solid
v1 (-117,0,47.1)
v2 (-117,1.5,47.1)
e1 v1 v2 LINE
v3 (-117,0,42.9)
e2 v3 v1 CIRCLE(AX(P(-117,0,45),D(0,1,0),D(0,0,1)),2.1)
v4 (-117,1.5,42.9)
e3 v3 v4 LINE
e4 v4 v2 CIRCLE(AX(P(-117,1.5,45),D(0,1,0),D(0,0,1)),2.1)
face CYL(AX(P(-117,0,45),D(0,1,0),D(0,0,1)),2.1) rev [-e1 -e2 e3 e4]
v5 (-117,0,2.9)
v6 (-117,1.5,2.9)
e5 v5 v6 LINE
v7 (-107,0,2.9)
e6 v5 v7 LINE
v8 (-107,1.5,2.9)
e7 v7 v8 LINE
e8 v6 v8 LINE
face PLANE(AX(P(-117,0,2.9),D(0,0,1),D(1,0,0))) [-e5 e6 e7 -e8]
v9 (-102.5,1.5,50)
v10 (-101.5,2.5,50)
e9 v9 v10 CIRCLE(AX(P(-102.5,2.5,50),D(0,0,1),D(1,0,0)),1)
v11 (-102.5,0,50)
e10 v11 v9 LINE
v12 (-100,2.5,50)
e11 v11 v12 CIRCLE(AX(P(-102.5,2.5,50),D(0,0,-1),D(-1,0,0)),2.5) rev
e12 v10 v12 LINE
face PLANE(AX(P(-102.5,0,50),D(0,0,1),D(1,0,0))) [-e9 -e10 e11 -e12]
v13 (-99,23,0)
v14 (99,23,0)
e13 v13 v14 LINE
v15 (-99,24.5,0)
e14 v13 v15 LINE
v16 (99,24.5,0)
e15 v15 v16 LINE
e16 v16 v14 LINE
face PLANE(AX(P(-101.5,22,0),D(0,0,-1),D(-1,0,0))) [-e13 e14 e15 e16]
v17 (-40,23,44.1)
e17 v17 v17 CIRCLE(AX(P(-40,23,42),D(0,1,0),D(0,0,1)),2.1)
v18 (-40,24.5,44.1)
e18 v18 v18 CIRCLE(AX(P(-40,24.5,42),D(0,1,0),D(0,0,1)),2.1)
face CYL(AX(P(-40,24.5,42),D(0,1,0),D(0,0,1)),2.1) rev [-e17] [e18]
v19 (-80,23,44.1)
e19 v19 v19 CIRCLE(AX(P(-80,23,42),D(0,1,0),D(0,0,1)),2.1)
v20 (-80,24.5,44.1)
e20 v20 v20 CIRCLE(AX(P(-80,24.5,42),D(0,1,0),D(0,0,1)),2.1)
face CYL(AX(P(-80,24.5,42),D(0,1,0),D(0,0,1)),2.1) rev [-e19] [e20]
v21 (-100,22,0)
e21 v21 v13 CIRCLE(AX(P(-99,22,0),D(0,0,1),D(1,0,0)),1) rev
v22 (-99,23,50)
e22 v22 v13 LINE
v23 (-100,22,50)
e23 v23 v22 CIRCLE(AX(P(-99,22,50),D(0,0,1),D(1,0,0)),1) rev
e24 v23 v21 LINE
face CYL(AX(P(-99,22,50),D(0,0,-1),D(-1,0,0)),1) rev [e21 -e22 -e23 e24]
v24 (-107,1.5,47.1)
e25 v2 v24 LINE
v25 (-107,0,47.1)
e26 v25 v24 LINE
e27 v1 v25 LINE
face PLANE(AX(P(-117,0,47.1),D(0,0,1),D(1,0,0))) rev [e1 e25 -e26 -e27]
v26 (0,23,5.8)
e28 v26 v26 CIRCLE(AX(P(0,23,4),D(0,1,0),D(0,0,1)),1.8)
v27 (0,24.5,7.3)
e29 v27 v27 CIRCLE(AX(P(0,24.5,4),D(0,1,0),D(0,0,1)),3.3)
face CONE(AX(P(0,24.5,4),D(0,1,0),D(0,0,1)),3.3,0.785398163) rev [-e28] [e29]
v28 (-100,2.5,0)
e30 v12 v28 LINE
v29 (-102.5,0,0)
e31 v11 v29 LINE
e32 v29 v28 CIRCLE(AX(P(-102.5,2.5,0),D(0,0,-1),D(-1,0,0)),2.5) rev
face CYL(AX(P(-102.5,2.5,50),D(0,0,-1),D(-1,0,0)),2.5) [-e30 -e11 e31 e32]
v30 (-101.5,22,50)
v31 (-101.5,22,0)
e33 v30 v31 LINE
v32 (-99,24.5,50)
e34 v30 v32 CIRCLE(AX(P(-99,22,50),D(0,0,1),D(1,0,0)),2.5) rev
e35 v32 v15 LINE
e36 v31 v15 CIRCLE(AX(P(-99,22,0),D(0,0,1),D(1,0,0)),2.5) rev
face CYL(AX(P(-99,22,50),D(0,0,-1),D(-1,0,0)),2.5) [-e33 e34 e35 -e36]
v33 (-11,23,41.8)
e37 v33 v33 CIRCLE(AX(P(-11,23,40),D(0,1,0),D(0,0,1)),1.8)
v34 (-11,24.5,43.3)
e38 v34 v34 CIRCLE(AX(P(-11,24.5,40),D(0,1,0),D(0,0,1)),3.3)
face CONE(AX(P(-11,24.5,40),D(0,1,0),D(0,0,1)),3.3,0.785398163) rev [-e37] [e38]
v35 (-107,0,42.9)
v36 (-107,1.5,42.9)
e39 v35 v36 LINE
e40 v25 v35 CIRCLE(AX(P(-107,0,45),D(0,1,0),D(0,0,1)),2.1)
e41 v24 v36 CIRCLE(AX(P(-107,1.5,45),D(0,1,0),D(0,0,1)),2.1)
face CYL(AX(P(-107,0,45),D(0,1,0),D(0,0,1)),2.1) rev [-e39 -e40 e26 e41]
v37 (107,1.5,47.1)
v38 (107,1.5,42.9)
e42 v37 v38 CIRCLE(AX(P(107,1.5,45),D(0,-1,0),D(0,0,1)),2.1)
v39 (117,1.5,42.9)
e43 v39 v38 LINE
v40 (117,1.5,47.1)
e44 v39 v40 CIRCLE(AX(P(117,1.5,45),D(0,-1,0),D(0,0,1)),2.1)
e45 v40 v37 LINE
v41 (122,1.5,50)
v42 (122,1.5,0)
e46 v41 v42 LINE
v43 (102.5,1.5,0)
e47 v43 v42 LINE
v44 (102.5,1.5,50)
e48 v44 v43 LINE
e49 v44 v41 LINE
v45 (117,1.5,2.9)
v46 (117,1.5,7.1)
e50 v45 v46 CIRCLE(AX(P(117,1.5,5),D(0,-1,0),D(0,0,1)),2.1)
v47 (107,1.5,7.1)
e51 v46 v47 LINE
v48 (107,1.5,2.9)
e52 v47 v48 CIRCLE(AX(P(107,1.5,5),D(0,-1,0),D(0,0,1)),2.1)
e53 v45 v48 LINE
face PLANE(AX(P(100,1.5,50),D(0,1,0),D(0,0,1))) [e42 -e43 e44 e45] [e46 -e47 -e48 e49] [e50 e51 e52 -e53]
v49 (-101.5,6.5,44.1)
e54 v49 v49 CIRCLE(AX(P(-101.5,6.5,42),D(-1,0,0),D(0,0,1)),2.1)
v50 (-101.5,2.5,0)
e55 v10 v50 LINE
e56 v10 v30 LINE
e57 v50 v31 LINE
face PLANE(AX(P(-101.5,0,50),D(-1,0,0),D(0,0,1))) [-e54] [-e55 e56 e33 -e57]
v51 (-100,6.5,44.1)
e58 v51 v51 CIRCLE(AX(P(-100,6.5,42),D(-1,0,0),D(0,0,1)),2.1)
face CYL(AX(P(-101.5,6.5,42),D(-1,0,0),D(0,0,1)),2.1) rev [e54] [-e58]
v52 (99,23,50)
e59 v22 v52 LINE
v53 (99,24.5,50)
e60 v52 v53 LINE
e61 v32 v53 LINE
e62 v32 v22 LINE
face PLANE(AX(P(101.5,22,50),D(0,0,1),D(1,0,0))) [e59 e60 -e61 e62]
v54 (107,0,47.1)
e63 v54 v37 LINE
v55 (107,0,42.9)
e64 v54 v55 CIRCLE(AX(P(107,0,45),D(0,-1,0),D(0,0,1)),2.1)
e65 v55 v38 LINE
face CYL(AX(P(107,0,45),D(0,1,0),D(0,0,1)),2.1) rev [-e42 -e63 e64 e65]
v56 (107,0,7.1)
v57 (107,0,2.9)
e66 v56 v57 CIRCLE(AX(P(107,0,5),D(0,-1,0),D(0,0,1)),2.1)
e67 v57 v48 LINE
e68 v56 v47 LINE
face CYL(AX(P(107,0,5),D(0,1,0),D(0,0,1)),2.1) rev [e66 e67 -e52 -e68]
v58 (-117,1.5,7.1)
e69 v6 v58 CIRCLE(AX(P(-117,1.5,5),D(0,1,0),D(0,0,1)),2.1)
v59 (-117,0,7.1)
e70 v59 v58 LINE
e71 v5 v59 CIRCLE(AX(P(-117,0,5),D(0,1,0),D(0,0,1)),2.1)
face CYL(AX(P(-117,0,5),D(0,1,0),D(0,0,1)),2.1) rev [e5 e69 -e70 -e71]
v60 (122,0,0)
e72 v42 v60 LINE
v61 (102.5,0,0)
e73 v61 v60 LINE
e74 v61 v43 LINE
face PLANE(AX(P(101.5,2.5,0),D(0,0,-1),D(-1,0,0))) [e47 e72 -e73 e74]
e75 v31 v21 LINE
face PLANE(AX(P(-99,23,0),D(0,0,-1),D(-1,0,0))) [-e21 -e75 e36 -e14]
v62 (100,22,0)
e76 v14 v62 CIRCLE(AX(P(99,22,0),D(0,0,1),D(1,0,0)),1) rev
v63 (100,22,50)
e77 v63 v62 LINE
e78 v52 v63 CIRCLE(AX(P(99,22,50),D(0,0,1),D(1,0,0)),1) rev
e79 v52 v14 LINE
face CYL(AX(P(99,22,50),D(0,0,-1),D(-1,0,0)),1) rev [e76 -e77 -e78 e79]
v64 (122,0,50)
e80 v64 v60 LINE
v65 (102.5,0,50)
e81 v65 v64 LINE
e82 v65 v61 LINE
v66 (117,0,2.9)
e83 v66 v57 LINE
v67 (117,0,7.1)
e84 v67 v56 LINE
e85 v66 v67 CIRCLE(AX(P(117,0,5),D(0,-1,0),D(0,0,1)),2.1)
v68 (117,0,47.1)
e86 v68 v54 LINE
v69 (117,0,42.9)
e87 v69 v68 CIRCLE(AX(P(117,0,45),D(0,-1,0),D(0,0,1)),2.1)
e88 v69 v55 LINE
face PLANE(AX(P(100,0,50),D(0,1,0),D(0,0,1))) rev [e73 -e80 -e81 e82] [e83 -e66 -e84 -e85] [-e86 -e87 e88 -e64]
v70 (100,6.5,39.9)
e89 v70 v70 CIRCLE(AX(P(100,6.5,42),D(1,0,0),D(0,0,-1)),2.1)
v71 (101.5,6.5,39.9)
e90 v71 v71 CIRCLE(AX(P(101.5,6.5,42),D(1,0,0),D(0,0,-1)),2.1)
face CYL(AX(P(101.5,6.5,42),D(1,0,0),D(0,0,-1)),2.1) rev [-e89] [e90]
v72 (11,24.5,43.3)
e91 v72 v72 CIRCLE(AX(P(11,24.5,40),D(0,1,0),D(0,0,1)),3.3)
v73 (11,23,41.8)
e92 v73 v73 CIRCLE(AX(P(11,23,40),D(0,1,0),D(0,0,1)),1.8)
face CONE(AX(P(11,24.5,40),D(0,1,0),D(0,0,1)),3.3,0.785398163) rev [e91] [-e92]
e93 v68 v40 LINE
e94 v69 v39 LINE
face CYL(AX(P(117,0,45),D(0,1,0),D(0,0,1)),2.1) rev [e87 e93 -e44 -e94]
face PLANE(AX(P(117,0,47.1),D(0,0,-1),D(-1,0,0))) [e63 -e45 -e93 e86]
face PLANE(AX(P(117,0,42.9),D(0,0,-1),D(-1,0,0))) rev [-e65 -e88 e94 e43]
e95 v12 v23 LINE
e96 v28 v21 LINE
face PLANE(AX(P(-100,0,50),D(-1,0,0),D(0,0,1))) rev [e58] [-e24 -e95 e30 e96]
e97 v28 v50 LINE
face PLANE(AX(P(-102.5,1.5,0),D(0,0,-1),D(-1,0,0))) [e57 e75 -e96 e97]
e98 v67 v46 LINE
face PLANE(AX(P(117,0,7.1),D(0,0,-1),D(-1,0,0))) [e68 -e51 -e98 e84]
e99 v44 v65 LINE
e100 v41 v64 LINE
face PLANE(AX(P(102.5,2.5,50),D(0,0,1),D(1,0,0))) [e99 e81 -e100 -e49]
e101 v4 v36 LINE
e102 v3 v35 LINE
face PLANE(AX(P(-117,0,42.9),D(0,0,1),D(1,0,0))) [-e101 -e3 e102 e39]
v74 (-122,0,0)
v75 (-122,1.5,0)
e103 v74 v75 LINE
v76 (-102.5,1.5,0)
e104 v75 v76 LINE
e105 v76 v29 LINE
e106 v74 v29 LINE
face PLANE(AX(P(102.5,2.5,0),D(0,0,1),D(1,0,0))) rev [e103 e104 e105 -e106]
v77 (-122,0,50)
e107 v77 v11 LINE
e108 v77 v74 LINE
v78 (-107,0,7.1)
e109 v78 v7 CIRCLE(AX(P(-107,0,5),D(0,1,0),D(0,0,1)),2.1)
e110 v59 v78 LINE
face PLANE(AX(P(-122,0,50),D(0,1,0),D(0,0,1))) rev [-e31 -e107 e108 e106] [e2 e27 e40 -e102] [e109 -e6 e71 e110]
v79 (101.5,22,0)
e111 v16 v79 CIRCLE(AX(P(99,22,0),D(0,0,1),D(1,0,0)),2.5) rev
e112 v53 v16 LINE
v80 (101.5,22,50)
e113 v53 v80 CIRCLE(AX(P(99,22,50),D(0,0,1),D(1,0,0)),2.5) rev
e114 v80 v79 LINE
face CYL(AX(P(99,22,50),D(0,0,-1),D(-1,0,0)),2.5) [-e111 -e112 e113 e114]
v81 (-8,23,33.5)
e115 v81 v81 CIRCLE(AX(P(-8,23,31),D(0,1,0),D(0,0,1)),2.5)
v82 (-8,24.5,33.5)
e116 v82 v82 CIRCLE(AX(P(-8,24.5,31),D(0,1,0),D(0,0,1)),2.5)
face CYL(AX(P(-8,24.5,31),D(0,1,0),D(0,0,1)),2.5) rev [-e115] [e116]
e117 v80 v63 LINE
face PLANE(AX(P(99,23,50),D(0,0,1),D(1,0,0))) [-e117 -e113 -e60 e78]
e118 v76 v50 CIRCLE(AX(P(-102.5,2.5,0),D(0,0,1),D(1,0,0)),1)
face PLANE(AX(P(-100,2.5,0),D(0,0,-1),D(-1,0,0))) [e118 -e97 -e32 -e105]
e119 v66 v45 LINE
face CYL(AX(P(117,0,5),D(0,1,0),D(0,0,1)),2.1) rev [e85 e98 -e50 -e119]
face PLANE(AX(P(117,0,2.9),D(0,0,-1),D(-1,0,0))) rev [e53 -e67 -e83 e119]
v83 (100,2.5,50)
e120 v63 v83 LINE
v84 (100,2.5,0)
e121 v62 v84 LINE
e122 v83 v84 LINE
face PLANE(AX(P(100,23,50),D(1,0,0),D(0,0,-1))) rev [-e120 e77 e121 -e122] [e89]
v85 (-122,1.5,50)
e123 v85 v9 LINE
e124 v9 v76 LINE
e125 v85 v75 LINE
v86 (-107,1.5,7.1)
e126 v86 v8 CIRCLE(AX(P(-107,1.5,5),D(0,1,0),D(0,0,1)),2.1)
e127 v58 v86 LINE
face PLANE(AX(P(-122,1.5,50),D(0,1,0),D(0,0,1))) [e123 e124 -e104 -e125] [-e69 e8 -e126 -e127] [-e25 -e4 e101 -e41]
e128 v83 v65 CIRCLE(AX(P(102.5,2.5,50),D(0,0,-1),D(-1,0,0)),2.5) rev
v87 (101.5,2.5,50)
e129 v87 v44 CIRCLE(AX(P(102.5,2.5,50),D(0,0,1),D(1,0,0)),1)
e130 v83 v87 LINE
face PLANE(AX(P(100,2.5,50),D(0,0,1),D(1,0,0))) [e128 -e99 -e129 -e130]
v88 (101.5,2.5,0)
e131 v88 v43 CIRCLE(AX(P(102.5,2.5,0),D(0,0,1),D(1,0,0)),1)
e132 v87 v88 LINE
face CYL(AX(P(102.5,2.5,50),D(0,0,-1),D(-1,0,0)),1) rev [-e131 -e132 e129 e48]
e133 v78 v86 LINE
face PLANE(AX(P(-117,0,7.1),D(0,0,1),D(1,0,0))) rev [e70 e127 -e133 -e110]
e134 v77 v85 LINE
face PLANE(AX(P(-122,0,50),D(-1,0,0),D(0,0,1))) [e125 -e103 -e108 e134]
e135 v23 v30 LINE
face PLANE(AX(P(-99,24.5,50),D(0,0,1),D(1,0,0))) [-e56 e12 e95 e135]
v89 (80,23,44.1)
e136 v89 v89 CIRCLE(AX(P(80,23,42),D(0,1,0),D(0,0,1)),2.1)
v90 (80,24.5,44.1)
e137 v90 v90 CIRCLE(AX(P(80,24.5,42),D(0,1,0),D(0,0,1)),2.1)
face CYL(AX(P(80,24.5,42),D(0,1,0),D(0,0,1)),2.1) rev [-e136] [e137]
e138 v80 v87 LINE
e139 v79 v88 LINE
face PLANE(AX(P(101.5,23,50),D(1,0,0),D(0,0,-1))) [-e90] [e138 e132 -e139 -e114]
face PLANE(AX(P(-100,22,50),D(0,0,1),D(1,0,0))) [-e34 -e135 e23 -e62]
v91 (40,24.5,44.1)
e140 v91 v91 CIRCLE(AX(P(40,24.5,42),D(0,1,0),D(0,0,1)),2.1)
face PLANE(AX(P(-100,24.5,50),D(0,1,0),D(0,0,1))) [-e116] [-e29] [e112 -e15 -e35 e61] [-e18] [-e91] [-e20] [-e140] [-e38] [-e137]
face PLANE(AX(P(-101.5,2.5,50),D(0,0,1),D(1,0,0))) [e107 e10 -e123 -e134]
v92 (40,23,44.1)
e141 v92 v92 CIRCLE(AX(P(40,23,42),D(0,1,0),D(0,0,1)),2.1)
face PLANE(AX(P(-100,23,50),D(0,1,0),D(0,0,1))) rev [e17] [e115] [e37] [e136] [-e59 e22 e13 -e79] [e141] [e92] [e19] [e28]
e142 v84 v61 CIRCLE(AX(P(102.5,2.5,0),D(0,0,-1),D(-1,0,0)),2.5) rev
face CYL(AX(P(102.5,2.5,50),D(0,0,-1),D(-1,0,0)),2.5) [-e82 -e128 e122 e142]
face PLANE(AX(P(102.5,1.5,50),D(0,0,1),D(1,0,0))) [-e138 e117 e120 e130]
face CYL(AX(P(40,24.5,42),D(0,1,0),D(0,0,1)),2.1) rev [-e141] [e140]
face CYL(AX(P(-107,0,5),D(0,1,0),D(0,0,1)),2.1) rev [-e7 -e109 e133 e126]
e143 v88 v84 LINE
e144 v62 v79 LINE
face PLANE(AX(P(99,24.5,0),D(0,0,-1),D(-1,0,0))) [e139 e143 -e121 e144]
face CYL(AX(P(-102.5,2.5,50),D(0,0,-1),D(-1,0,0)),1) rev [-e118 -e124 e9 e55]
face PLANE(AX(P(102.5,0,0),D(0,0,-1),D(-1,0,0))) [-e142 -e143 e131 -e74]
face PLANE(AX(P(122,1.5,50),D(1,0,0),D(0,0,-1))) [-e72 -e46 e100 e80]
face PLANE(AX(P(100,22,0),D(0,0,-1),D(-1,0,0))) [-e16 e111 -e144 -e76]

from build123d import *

# Parameters (mm, degrees)
SM_BASE_FLANGE_1_DEPTH       = 50
HOLE_WIZARD_1_AT_2_COUNT     = 2
HOLE_WIZARD_1_AT_2_PITCH     = 37.643060449
HOLE_WIZARD_1_AT_3_COUNT     = 2
HOLE_WIZARD_1_AT_3_PITCH     = 37.643060449
HOLE_WIZARD_4_2_4_2_1_D      = 4.2
HOLE_WIZARD_4_2_4_2_2_REACH  = 232.331
HOLE_WIZARD_4_2_4_2_2_BORE_R = 2.1
CUT_EXTRUDE_1_DEPTH          = 134.839456066
HOLE_WIZARD_5_0_5_1_D        = 5


# Read off the part's stored shape, not the designer's step: 基体-法兰1
with BuildPart() as part:
    # 基体-法兰1 outline → 基体-法兰1 (new body)
    with BuildSketch(Plane.XY):
        with BuildLine():
            Line((102.5, 0), (122, 0))
            Line((122, 0), (122, 1.5))
            Line((122, 1.5), (102.5, 1.5))
            ThreePointArc((102.5, 1.5), (101.792893219, 1.792893219), (101.5, 2.5))
            Line((101.5, 2.5), (101.5, 22))
            ThreePointArc((101.5, 22), (100.767766953, 23.767766953), (99, 24.5))
            Line((99, 24.5), (-99, 24.5))
            ThreePointArc((-99, 24.5), (-100.767766953, 23.767766953), (-101.5, 22))
            Line((-101.5, 22), (-101.5, 2.5))
            ThreePointArc((-101.5, 2.5), (-101.792893219, 1.792893219), (-102.5, 1.5))
            Line((-102.5, 1.5), (-122, 1.5))
            Line((-122, 1.5), (-122, 0))
            Line((-122, 0), (-102.5, 0))
            ThreePointArc((-102.5, 0), (-100.732233047, 0.732233047), (-100, 2.5))
            Line((-100, 2.5), (-100, 22))
            ThreePointArc((-100, 22), (-99.707106781, 22.707106781), (-99, 23))
            Line((-99, 23), (99, 23))
            ThreePointArc((99, 23), (99.707106781, 22.707106781), (100, 22))
            Line((100, 22), (100, 2.5))
            ThreePointArc((100, 2.5), (100.732233047, 0.732233047), (102.5, 0))
        make_face()
    extrude(amount=SM_BASE_FLANGE_1_DEPTH)

    # 草图9 → 打孔尺寸(%根据)开槽沉头木螺钉的类型1 (revolve, cut)
    with BuildSketch(Plane(origin=(0, 24.5, 4), x_dir=(0, 0, 1), z_dir=(1, 0, 0))):
        Polygon((0, 0), (0, 1.5), (1.7, 1.5), (1.7, 1.6), (3.3, 0), align=None)
    hole_wizard_1 = revolve(axis=Axis((0, 30.85, 4), (0, -1, 0)), mode=Mode.SUBTRACT)

    # 打孔尺寸(%根据)开槽沉头木螺钉的类型1 at 2: 打孔尺寸(%根据)开槽沉头木螺钉的类型1 ×2
    with Locations(*[Vector(-0.29221853559902017, 0, 0.956351571051339) * (i * HOLE_WIZARD_1_AT_2_PITCH) for i in range(1, HOLE_WIZARD_1_AT_2_COUNT)]):
        add(hole_wizard_1, mode=Mode.SUBTRACT)

    # 打孔尺寸(%根据)开槽沉头木螺钉的类型1 at 3: 打孔尺寸(%根据)开槽沉头木螺钉的类型1 ×2
    with Locations(*[Vector(0.2922185355990204, 0, 0.956351571051339) * (i * HOLE_WIZARD_1_AT_3_PITCH) for i in range(1, HOLE_WIZARD_1_AT_3_COUNT)]):
        add(hole_wizard_1, mode=Mode.SUBTRACT)

    # Ø4.2 (4.2) 直径孔1 (through all)
    with Locations(Plane(origin=(0, 24.5, 0), x_dir=(1, 0, 0), z_dir=(0, 1, 0))):
        with Locations((-40, -42), (-80, -42), (40, -42), (80, -42)):
            Hole(HOLE_WIZARD_4_2_4_2_1_D / 2)

    # Ø4.2 (4.2) 直径孔2 bore → Ø4.2 (4.2) 直径孔2 (cut, up to next)
    with BuildSketch(Plane(origin=(101.5, 0, 0), x_dir=(0, 0, -1), z_dir=(1, 0, 0)), mode=Mode.PRIVATE) as hole_wizard_4_2_4_2_2_sk1:
        with Locations((-42, 6.5)):
            Circle(HOLE_WIZARD_4_2_4_2_2_BORE_R)
    hole_wizard_4_2_4_2_2_tool1 = extrude(hole_wizard_4_2_4_2_2_sk1.sketch, amount=-HOLE_WIZARD_4_2_4_2_2_REACH, mode=Mode.PRIVATE) & part.part
    hole_wizard_4_2_4_2_2 = hole_wizard_4_2_4_2_2_tool1.solids().sort_by_distance((101.5, 6.5, 42))[0]
    add(hole_wizard_4_2_4_2_2, mode=Mode.SUBTRACT)

    # 镜向1: Ø4.2 (4.2) 直径孔2 across plane
    add(hole_wizard_4_2_4_2_2.mirror(Plane(origin=(0, 0, 0), x_dir=(0, 0, 1), z_dir=(1, 0, 0))), mode=Mode.SUBTRACT)

    # 草图15 → 切除-拉伸1 (cut, through all)
    with BuildSketch(Plane(origin=(0, 1.5, 0), x_dir=(1, 0, 0), z_dir=(0, 1, 0))):
        with BuildLine():
            Line((-117, -2.9), (-107, -2.9))
            ThreePointArc((-107, -2.9), (-104.9, -5), (-107, -7.1))
            Line((-107, -7.1), (-117, -7.1))
            ThreePointArc((-117, -7.1), (-119.1, -5), (-117, -2.9))
        make_face()
        with BuildLine():
            Line((-117, -42.9), (-107, -42.9))
            ThreePointArc((-107, -42.9), (-104.9, -45), (-107, -47.1))
            Line((-107, -47.1), (-117, -47.1))
            ThreePointArc((-117, -47.1), (-119.1, -45), (-117, -42.9))
        make_face()
    cut_extrude_1 = extrude(amount=-CUT_EXTRUDE_1_DEPTH, mode=Mode.SUBTRACT)

    # 镜向2: 切除-拉伸1 across plane
    add(cut_extrude_1.mirror(Plane(origin=(0, 0, 0), x_dir=(0, 0, 1), z_dir=(1, 0, 0))), mode=Mode.SUBTRACT)

    # Ø5.0 (5) 直径孔1 (through all)
    with Locations(Plane(origin=(0, 24.5, 0), x_dir=(1, 0, 0), z_dir=(0, 1, 0))):
        with Locations((-8, -31)):
            Hole(HOLE_WIZARD_5_0_5_1_D / 2)


solid = part.part
